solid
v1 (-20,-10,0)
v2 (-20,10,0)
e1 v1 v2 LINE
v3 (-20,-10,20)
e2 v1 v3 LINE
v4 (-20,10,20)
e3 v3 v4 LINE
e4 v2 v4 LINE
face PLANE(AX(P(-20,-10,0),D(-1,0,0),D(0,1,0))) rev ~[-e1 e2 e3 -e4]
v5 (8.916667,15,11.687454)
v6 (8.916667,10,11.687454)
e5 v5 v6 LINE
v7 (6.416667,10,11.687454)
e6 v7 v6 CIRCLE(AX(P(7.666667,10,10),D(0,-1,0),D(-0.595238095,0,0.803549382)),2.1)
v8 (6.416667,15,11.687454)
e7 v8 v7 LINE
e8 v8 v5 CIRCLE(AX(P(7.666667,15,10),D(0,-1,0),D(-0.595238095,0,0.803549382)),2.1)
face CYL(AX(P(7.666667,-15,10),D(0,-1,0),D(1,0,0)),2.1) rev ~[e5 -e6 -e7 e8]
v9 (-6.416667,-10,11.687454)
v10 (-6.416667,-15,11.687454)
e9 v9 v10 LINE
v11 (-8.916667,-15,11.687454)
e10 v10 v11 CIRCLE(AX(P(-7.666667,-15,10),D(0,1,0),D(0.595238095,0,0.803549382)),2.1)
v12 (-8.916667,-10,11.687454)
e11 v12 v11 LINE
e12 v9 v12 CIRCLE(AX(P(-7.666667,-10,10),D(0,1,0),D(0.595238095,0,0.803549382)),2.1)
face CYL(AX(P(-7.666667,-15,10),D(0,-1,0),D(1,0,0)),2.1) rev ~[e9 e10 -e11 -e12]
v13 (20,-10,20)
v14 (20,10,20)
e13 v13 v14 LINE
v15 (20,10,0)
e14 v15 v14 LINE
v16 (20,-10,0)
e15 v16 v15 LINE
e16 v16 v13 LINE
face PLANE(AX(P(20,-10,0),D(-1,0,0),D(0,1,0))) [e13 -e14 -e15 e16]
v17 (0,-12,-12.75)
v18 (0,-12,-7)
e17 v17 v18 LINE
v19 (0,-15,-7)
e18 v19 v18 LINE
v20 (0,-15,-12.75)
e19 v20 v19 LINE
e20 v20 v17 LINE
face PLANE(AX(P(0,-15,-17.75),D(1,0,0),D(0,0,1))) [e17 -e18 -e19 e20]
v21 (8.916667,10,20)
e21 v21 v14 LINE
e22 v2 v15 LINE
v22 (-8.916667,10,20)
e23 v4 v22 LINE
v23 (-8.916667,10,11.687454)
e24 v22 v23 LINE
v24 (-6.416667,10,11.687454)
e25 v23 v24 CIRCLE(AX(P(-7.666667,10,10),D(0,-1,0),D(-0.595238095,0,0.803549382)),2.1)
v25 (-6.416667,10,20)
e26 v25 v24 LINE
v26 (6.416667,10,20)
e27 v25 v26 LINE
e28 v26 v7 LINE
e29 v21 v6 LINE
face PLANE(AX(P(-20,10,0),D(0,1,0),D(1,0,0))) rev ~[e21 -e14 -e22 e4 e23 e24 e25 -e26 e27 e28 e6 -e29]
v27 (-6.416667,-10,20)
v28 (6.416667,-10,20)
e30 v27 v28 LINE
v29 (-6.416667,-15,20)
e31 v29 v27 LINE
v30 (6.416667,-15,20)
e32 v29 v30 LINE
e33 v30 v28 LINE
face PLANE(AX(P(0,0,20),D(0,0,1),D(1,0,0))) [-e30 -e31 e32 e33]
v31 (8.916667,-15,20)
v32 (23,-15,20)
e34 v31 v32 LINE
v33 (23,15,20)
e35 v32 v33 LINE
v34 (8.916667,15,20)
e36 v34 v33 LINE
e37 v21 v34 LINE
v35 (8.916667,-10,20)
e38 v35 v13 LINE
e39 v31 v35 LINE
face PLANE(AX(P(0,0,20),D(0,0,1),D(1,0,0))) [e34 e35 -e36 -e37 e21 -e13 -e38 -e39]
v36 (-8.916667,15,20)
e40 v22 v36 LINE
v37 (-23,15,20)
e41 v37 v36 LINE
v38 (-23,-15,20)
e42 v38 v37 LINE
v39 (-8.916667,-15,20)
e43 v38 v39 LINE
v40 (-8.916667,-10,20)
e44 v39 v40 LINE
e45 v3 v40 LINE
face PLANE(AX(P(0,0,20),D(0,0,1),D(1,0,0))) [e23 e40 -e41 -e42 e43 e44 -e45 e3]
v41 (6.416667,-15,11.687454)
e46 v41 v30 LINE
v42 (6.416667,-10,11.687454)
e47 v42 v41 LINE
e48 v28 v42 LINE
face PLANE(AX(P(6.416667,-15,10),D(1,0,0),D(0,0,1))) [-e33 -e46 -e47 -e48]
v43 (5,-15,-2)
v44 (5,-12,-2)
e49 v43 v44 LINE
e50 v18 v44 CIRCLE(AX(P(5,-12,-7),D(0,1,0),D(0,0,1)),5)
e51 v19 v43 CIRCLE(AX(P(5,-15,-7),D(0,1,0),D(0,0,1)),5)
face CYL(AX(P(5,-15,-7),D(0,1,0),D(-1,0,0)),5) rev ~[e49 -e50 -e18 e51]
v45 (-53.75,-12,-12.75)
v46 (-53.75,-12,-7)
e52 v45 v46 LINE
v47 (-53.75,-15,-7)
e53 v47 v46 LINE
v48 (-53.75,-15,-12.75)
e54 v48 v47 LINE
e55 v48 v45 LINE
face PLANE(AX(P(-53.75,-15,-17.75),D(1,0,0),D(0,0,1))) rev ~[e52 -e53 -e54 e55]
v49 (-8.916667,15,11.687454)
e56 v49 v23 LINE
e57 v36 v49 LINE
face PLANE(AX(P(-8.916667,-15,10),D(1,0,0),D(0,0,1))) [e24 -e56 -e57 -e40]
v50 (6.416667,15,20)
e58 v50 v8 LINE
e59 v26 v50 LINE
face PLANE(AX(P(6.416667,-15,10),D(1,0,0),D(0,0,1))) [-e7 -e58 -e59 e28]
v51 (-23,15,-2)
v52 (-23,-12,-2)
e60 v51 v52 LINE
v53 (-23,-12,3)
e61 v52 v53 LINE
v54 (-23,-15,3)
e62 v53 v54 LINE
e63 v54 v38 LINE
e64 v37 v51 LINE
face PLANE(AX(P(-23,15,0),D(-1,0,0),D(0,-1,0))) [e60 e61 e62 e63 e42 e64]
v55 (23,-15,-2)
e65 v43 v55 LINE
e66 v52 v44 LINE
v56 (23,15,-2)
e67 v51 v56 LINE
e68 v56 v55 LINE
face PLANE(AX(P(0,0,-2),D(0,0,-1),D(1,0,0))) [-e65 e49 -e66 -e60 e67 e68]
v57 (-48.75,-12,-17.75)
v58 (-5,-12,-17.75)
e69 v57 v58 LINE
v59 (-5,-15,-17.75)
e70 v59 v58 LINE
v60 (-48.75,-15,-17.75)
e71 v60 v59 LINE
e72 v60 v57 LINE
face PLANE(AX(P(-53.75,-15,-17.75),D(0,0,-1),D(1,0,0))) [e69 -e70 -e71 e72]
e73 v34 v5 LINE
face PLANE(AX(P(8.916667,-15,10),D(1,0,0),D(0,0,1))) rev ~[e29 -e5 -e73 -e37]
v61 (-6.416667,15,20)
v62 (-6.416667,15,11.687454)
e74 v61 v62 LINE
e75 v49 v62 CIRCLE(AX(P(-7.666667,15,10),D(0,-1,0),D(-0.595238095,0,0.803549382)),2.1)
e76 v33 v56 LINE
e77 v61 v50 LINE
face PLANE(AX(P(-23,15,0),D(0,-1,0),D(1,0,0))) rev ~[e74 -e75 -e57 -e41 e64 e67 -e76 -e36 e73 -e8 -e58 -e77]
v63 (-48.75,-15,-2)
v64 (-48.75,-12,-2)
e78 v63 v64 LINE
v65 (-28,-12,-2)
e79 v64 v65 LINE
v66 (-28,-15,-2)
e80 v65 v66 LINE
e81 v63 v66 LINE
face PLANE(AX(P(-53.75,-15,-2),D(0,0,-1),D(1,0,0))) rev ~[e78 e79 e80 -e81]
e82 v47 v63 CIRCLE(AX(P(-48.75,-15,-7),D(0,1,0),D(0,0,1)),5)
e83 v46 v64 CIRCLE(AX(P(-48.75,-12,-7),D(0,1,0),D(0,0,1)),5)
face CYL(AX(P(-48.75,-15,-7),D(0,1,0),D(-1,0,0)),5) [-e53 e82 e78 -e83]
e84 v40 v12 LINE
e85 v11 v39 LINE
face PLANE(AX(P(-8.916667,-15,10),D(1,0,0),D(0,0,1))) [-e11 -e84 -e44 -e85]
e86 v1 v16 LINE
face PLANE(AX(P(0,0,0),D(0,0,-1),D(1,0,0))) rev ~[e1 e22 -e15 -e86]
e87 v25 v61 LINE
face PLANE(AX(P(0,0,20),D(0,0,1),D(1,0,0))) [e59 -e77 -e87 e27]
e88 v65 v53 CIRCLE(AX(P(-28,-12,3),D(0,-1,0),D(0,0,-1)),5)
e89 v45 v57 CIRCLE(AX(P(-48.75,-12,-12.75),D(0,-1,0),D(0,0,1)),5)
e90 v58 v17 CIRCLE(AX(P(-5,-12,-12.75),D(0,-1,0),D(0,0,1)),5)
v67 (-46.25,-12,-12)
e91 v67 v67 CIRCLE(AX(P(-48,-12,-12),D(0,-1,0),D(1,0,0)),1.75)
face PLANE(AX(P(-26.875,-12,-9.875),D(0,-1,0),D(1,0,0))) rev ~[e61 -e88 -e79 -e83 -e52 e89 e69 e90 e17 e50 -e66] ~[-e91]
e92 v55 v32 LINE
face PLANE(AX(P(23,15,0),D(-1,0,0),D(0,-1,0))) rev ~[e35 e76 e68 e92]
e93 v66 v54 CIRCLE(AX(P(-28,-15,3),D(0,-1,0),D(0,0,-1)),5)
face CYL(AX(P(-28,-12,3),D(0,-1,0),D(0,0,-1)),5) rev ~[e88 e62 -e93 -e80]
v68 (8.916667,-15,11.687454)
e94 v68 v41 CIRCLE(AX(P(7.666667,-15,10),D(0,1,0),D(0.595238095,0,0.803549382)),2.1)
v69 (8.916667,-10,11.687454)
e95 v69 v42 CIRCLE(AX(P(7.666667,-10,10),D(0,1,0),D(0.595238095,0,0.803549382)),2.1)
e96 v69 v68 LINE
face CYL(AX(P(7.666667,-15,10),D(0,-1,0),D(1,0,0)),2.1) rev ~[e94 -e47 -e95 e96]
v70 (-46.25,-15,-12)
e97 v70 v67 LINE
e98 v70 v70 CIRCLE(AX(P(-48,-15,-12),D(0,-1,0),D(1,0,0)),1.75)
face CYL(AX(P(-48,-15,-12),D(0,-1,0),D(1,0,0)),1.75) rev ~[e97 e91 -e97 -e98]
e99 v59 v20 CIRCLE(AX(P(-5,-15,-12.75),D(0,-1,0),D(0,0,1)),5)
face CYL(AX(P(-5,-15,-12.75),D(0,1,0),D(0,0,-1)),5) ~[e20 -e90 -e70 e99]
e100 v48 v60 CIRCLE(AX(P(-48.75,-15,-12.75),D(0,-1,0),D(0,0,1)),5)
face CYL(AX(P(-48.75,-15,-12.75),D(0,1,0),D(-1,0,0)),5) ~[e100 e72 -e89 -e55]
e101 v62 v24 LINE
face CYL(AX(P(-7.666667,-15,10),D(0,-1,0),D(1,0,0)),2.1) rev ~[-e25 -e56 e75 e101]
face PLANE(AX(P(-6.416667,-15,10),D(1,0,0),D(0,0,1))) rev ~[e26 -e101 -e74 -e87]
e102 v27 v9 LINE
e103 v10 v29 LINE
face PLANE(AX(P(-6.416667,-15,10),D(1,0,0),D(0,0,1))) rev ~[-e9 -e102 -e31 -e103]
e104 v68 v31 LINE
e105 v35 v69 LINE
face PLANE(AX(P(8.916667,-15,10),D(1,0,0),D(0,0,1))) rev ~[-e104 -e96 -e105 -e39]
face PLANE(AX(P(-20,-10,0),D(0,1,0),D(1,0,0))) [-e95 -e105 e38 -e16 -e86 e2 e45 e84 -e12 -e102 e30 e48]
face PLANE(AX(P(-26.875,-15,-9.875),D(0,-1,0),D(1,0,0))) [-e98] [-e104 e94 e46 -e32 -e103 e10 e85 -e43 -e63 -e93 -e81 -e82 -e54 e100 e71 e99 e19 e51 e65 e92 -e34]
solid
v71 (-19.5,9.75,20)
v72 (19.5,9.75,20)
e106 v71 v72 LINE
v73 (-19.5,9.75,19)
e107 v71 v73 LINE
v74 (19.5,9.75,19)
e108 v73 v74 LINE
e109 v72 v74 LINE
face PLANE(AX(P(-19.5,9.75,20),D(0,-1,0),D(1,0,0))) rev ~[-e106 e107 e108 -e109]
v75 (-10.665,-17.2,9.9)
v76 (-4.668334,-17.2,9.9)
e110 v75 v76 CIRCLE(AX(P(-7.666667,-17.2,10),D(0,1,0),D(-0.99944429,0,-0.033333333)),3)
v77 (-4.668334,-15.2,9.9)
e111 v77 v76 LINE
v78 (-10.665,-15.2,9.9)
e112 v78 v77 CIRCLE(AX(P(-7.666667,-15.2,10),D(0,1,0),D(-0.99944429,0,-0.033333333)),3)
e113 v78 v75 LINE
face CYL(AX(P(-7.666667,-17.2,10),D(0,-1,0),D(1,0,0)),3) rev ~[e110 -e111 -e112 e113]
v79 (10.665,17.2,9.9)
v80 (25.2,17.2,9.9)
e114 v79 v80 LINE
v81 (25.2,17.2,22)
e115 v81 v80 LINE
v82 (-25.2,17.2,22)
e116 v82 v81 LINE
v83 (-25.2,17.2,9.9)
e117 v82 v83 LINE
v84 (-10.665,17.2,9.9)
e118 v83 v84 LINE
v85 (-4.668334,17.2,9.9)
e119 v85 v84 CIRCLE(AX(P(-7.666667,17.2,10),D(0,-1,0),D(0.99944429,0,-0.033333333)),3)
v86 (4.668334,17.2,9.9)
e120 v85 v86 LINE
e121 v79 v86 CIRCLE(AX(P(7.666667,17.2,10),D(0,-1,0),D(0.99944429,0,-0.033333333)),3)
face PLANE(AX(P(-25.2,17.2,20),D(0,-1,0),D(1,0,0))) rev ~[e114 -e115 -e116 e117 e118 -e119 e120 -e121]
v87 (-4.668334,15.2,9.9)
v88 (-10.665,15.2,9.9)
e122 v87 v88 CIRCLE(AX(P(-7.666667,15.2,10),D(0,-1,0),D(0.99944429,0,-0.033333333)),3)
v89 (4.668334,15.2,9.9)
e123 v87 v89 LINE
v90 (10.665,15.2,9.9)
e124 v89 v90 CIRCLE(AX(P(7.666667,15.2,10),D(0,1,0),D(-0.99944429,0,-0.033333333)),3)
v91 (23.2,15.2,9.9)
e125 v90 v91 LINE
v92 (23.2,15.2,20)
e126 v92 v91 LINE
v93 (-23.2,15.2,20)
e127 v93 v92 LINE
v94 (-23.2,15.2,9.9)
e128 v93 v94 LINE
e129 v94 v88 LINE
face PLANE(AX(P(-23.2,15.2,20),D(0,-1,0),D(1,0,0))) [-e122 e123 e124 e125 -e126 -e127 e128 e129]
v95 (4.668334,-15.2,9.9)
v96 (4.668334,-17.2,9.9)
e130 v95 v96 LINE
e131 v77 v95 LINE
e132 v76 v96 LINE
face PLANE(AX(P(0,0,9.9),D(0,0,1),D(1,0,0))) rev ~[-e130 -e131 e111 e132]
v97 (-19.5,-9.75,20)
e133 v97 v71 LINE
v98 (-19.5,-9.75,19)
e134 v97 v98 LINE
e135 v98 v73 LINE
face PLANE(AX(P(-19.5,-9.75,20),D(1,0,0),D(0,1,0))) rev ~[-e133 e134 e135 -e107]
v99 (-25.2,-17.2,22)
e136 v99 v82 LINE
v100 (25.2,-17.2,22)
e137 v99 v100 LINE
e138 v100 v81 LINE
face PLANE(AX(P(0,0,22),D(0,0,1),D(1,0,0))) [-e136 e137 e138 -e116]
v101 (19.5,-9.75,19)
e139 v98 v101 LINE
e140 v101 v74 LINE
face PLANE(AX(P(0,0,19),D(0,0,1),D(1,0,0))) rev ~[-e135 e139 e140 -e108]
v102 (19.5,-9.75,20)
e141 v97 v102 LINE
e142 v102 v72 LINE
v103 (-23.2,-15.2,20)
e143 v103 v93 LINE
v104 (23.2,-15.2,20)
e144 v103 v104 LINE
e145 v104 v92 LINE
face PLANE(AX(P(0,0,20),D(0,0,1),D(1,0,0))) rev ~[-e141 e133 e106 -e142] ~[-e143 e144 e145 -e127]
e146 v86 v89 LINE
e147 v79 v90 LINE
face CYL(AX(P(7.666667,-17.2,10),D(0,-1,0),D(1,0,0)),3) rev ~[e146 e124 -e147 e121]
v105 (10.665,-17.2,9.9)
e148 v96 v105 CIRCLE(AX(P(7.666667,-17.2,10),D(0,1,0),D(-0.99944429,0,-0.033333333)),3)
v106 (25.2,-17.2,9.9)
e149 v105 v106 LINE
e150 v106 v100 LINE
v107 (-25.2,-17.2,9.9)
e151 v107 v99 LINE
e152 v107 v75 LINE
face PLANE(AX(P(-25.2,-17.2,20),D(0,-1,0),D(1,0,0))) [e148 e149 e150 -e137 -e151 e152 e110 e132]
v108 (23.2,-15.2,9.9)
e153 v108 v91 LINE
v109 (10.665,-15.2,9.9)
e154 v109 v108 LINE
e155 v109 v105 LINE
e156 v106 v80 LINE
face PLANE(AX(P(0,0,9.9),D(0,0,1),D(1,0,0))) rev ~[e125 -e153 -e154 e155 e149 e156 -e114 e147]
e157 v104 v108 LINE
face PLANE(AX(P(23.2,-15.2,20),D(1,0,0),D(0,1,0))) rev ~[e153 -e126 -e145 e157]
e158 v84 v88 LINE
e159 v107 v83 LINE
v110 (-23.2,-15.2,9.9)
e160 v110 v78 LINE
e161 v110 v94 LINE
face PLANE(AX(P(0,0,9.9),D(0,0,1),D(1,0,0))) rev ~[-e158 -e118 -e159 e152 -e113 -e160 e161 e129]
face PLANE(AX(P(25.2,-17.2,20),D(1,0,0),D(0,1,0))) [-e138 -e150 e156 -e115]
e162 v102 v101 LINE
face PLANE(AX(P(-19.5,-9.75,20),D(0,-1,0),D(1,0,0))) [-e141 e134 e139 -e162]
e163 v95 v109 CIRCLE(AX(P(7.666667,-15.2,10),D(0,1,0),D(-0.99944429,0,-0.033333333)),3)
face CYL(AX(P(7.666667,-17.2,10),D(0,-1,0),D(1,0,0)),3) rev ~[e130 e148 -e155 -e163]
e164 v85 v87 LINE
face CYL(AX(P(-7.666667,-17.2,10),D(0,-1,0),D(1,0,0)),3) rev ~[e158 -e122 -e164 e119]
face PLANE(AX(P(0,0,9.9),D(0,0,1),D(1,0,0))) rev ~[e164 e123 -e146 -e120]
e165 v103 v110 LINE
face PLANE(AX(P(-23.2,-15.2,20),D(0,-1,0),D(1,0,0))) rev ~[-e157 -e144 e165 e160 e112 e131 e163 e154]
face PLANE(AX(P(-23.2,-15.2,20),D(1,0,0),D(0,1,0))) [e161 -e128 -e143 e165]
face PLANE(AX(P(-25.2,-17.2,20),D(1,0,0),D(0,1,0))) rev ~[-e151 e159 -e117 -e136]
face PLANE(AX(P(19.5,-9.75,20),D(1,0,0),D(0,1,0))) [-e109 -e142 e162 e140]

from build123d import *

# Parameters (mm, degrees)
F0_W      = 46
F0_H      = 30
F0_W_2    = 40
F0_H_2    = 20
F1_DEPTH  = 20
F2_R      = 2.1
F3_DEPTH  = 30.001
F4_W      = 2.5
F4_H      = 13.7547671329
F5_DEPTH  = 30.001
F6_W      = 46
F6_H      = 30
F7_DEPTH  = 2
F8_W      = 53.75
F8_H      = 15.75
F8_R      = 1.75
F9_DEPTH  = 3
F10_R     = 5
F11_W     = 50.4
F11_H     = 34.4
F11_W_2   = 46.4
F11_H_2   = 30.4
F11_W_3   = 39
F11_H_3   = 19.5
F12_DEPTH = 2
F13_DEPTH = 1
F14_DEPTH = 10.1
F15_R     = 3
F16_DEPTH = 34.401


with BuildPart() as f1:
    # F0 (on Top) → F1 (new body)
    with BuildSketch(Plane.XY):
        Rectangle(F0_W, F0_H)
        Rectangle(F0_W_2, F0_H_2, mode=Mode.SUBTRACT)
    extrude(amount=F1_DEPTH)

    # F2 (on face) → F3 (cut, through all)
    with BuildSketch(Plane.XZ.offset(15)):
        with Locations((-7.6666666667, 10)):
            Circle(F2_R)
        with Locations((7.6666666667, 10)):
            Circle(F2_R)
    extrude(amount=-F3_DEPTH, mode=Mode.SUBTRACT)

    # F4 (on face) → F5 (cut, through all)
    with BuildSketch(Plane.XZ.offset(15)):
        with Locations((-7.6666666667, 16.8773835665)):
            Rectangle(F4_W, F4_H)
        with Locations((7.6666666667, 16.8773835665)):
            Rectangle(F4_W, F4_H)
    extrude(amount=-F5_DEPTH, mode=Mode.SUBTRACT)

    # F6 (on face) → F7 (join)
    with BuildSketch(Plane(origin=(0, 0, 0), x_dir=(1, 0, 0), z_dir=(0, 0, -1))):
        Rectangle(F6_W, F6_H)
    extrude(amount=F7_DEPTH)

    # F8 (on face) → F9 (join)
    with BuildSketch(Plane.XZ.offset(15)):
        with Locations((-26.875, -9.875)):
            Rectangle(F8_W, F8_H)
        with Locations((-48, -12)):
            Circle(F8_R, mode=Mode.SUBTRACT)
    extrude(amount=-F9_DEPTH)

    # F10
    f10_edges = [f1.edges().sort_by_distance(p)[0] for p in [
        (-53.75, -13.5, -2),
        (-53.75, -13.5, -17.75),
        (-23, -13.5, -2),
        (0, -13.5, -2),
        (0, -13.5, -17.75),
    ]]
    fillet(f10_edges, radius=F10_R)


with BuildPart() as f12:
    # F11 (on face) → F12 (new body)
    with BuildSketch(Plane.XY.offset(20)):
        Rectangle(F11_W, F11_H)
        Rectangle(F11_W_2, F11_H_2, mode=Mode.SUBTRACT)
        Rectangle(F11_W_2, F11_H_2)
        Polygon((-8.9166666667, 15), (-8.9166666667, 10), (-20, 10), (-20, -10), (-8.9166666667, -10), (-8.9166666667, -15), (-23, -15), (-23, 15), align=None, mode=Mode.SUBTRACT)
        Rectangle(F11_W_3, F11_H_3, mode=Mode.SUBTRACT)
        Rectangle(F11_W_3, F11_H_3)
        Polygon((-20, 10), (-8.9166666667, 10), (-8.9166666667, 15), (-23, 15), (-23, -15), (-8.9166666667, -15), (-8.9166666667, -10), (-20, -10), align=None)
    extrude(amount=F12_DEPTH)

    # F11 (on face) → F13 (join)
    with BuildSketch(Plane.XY.offset(20)):
        Rectangle(F11_W_3, F11_H_3)
    extrude(amount=-F13_DEPTH)

    # F11 (on face) → F14 (join)
    with BuildSketch(Plane.XY.offset(20)):
        Rectangle(F11_W, F11_H)
        Rectangle(F11_W_2, F11_H_2, mode=Mode.SUBTRACT)
    extrude(amount=-F14_DEPTH)

    # F15 (on face) → F16 (cut, through all)
    with BuildSketch(Plane.XZ.offset(17.2)):
        with Locations((-7.6666666667, 10)):
            Circle(F15_R)
        with Locations((7.6666666667, 10)):
            Circle(F15_R)
    extrude(amount=-F16_DEPTH, mode=Mode.SUBTRACT)


solid = Compound([f1.part, f12.part])
